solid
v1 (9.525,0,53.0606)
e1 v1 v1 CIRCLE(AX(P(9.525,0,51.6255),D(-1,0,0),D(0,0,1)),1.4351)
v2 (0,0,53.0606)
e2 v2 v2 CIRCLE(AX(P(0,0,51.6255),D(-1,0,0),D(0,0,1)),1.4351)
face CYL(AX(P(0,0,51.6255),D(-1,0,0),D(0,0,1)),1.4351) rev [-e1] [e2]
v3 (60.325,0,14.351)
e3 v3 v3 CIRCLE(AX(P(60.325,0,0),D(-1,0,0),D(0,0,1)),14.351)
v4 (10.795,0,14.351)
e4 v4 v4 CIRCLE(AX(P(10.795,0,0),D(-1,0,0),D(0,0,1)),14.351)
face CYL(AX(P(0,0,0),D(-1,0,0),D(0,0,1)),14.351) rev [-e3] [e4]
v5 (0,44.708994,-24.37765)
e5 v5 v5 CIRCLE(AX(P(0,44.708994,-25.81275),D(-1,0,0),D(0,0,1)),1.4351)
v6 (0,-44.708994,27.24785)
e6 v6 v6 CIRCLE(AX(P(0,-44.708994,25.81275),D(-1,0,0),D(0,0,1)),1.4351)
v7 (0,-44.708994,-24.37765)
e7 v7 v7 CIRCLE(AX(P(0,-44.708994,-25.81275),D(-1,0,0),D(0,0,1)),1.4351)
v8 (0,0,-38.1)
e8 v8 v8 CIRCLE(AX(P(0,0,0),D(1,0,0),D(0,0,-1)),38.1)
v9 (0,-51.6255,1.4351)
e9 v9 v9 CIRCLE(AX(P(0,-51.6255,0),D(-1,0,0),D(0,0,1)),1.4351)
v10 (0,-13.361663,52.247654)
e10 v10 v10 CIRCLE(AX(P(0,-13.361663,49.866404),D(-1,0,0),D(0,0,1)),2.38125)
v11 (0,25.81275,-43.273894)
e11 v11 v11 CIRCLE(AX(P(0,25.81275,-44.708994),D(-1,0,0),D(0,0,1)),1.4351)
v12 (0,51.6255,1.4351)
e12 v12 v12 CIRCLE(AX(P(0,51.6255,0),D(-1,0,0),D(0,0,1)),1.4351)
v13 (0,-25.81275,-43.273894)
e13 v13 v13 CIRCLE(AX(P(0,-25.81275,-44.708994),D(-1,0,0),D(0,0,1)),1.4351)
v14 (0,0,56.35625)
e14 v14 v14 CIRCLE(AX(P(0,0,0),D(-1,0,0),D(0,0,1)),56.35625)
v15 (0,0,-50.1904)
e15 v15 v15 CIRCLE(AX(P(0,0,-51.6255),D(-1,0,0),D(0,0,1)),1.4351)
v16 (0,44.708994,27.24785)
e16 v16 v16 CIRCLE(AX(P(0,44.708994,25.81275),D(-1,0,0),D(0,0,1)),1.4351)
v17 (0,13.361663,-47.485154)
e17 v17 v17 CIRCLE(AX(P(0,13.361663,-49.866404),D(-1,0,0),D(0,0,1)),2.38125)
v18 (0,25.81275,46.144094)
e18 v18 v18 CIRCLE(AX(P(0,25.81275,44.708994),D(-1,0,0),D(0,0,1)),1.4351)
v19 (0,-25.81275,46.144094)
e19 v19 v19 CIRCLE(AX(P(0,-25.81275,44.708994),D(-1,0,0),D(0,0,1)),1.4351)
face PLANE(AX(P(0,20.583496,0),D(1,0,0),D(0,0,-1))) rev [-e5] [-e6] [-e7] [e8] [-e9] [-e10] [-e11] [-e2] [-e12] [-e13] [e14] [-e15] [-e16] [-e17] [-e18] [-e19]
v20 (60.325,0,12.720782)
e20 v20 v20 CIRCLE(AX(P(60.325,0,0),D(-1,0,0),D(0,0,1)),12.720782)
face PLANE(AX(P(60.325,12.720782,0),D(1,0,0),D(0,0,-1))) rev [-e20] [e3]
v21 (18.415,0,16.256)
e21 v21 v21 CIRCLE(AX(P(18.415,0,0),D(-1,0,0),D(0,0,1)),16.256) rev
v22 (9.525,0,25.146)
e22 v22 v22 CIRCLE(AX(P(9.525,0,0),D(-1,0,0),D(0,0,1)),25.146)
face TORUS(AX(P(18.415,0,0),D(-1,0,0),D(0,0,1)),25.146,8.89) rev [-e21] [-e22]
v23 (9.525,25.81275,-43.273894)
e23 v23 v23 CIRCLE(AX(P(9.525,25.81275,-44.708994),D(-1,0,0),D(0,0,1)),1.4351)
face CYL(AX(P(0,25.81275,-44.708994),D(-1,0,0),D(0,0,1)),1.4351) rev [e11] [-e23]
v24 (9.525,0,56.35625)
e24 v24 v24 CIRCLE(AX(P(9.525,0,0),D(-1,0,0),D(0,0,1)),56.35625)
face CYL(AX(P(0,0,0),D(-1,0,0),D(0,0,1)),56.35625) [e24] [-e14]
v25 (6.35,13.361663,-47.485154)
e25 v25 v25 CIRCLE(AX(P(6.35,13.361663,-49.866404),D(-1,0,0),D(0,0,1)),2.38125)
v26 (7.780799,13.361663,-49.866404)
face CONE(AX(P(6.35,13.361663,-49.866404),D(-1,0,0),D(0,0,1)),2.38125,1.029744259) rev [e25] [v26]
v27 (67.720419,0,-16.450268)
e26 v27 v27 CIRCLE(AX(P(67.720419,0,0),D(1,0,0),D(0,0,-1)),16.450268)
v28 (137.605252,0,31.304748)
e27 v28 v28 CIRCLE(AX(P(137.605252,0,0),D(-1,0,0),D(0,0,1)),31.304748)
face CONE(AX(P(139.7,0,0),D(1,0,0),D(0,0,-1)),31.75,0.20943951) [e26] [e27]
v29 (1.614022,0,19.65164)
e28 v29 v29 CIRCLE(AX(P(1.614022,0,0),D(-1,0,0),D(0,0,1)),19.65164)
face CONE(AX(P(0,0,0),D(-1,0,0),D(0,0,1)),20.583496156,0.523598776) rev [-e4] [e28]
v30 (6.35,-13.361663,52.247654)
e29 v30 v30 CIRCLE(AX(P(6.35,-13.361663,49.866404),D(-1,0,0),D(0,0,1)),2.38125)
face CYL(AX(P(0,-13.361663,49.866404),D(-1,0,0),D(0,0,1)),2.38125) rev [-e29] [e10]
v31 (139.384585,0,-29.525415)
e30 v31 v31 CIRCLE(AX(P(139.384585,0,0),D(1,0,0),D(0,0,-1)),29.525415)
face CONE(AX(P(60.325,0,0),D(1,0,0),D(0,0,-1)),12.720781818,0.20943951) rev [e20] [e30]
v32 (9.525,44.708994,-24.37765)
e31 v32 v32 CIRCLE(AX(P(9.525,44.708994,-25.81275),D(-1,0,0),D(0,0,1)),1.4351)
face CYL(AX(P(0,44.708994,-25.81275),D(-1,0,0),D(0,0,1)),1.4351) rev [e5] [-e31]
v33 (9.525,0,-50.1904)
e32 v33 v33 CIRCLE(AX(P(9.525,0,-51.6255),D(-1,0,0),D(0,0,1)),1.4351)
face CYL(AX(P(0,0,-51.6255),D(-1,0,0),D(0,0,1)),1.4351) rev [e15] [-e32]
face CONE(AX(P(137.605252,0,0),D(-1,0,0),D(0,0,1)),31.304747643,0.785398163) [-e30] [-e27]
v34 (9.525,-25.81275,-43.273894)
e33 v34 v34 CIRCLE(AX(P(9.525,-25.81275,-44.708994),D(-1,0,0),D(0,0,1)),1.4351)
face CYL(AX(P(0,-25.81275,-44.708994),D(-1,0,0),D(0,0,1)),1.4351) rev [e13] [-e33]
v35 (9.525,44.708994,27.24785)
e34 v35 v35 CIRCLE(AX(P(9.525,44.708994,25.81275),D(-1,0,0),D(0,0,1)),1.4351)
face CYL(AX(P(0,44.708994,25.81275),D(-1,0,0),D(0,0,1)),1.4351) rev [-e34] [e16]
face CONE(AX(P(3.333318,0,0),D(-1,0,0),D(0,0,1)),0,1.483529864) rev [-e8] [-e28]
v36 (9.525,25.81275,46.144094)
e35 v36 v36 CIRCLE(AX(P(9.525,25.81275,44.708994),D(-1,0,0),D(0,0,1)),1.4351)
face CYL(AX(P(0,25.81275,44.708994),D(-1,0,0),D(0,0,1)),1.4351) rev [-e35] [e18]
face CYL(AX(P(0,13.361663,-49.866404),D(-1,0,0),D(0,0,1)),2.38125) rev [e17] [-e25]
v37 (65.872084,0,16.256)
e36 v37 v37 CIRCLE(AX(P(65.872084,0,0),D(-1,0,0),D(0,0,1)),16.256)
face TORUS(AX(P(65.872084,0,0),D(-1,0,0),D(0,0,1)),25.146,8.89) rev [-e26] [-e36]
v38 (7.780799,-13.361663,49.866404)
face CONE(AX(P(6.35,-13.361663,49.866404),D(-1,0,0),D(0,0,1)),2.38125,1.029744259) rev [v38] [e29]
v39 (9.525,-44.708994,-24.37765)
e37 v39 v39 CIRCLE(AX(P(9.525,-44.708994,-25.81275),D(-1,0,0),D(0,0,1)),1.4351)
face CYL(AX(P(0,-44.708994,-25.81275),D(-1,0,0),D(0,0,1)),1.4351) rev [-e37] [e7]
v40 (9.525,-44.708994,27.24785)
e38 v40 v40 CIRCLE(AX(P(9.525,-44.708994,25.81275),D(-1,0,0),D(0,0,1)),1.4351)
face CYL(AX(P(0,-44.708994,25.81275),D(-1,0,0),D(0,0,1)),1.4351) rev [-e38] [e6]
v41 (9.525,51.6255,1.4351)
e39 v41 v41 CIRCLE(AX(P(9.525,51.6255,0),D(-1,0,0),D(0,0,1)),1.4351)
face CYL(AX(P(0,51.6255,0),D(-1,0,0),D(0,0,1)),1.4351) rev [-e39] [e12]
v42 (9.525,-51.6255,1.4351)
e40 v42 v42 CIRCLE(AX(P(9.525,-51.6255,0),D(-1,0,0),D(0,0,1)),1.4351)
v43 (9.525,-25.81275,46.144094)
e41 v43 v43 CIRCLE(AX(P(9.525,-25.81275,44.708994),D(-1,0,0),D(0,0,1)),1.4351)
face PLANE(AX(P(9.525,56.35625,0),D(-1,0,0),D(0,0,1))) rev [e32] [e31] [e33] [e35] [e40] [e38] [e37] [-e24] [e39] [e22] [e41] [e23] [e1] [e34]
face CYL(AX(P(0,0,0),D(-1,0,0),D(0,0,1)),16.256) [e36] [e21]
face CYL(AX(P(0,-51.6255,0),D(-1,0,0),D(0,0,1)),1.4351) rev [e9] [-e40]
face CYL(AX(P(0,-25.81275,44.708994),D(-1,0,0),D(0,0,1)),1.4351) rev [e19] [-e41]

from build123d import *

# Parameters (mm, degrees)
FLANGE_HOLES_D    = 2.8702
DOWEL_HOLES_D     = 4.7625
DOWEL_HOLES_DEPTH = 6.35
DOWEL_HOLES_TIP   = 1.430799349
FILLET1_R         = 8.89
CHAMFER1_SIZE     = 2.141545552
CHAMFER1_SIZE_2   = 2.54


with BuildPart() as part:
    # Sketch2 → Main Structure (revolve)
    with BuildSketch(Plane.XY, mode=Mode.PRIVATE) as main_structure_sk:
        Polygon((0, 20.583496156), (0, 56.35625), (9.525, 56.35625), (9.525, 16.256), (66.806461084, 16.256), (139.7, 31.75), (139.7, 29.592458901), (60.325, 12.720781818), (60.325, 14.351), (10.795, 14.351), align=None)
    revolve(main_structure_sk.sketch.rotate(Axis((0, 0, 0), (1, 0, 0)), 90), axis=Axis((0, 0, 0), (1, 0, 0)))

    # Flange Holes (through all)
    with Locations(Plane.ZY):
        with Locations((0, -51.6255), (-25.81275, -44.708994483), (-44.708994483, -25.81275), (-51.6255, 0), (-44.708994483, 25.81275), (-25.81275, 44.708994483), (0, 51.6255), (25.81275, 44.708994483), (44.708994483, 25.81275), (51.6255, 0), (44.708994483, -25.81275), (25.81275, -44.708994483)):
            Hole(FLANGE_HOLES_D / 2)

    # Dowel Holes
    with Locations(Plane.ZY):
        with Locations((49.866403745, -13.361662613), (-49.866403745, 13.361662613)):
            Hole(DOWEL_HOLES_D / 2, depth=DOWEL_HOLES_DEPTH)
            with Locations((0, 0, -(DOWEL_HOLES_DEPTH + DOWEL_HOLES_TIP / 2))):  # 118° drill point
                Cone(0, DOWEL_HOLES_D / 2, DOWEL_HOLES_TIP, mode=Mode.SUBTRACT)

    # Fillet1
    fillet1_edges = [part.edges().sort_by_distance(p)[0] for p in [
        (66.806461084, 0, -16.256),
        (9.525, 0, -16.256),
    ]]
    fillet(fillet1_edges, radius=FILLET1_R)

    # Sketch13 → Cut-Revolve1 (revolve, cut)
    with BuildSketch(Plane(origin=(0, 0, 0), x_dir=(1, 0, 0), z_dir=(0, 1, 0)), mode=Mode.PRIVATE) as cut_revolve1_sk:
        Polygon((0, 38.1), (3.33331808, 0), (0, 0), align=None)
    revolve(cut_revolve1_sk.sketch.rotate(Axis((3.33331808, 0, 0), (-1, 0, 0)), 180), axis=Axis((3.33331808, 0, 0), (-1, 0, 0)), mode=Mode.SUBTRACT)

    # Chamfer1
    # the kernel refuses this chamfer: 3.297690964, 2.54, 2.141545552 mm, written as the material it takes off along each edge
    with BuildSketch(Plane(origin=(139.7, 0, 0), x_dir=(0, 0, 1), z_dir=(0, 1, 0))) as chamfer1_piece_1:
        Polygon((31.75 - CHAMFER1_SIZE * 0.207911690799, -CHAMFER1_SIZE * 0.978147600645), (31.75 - CHAMFER1_SIZE_2, 0), (31.75, 0), align=None)
    revolve(axis=Axis((139.7, 0, 0), (1, 0, 0)), mode=Mode.SUBTRACT)


solid = part.part
